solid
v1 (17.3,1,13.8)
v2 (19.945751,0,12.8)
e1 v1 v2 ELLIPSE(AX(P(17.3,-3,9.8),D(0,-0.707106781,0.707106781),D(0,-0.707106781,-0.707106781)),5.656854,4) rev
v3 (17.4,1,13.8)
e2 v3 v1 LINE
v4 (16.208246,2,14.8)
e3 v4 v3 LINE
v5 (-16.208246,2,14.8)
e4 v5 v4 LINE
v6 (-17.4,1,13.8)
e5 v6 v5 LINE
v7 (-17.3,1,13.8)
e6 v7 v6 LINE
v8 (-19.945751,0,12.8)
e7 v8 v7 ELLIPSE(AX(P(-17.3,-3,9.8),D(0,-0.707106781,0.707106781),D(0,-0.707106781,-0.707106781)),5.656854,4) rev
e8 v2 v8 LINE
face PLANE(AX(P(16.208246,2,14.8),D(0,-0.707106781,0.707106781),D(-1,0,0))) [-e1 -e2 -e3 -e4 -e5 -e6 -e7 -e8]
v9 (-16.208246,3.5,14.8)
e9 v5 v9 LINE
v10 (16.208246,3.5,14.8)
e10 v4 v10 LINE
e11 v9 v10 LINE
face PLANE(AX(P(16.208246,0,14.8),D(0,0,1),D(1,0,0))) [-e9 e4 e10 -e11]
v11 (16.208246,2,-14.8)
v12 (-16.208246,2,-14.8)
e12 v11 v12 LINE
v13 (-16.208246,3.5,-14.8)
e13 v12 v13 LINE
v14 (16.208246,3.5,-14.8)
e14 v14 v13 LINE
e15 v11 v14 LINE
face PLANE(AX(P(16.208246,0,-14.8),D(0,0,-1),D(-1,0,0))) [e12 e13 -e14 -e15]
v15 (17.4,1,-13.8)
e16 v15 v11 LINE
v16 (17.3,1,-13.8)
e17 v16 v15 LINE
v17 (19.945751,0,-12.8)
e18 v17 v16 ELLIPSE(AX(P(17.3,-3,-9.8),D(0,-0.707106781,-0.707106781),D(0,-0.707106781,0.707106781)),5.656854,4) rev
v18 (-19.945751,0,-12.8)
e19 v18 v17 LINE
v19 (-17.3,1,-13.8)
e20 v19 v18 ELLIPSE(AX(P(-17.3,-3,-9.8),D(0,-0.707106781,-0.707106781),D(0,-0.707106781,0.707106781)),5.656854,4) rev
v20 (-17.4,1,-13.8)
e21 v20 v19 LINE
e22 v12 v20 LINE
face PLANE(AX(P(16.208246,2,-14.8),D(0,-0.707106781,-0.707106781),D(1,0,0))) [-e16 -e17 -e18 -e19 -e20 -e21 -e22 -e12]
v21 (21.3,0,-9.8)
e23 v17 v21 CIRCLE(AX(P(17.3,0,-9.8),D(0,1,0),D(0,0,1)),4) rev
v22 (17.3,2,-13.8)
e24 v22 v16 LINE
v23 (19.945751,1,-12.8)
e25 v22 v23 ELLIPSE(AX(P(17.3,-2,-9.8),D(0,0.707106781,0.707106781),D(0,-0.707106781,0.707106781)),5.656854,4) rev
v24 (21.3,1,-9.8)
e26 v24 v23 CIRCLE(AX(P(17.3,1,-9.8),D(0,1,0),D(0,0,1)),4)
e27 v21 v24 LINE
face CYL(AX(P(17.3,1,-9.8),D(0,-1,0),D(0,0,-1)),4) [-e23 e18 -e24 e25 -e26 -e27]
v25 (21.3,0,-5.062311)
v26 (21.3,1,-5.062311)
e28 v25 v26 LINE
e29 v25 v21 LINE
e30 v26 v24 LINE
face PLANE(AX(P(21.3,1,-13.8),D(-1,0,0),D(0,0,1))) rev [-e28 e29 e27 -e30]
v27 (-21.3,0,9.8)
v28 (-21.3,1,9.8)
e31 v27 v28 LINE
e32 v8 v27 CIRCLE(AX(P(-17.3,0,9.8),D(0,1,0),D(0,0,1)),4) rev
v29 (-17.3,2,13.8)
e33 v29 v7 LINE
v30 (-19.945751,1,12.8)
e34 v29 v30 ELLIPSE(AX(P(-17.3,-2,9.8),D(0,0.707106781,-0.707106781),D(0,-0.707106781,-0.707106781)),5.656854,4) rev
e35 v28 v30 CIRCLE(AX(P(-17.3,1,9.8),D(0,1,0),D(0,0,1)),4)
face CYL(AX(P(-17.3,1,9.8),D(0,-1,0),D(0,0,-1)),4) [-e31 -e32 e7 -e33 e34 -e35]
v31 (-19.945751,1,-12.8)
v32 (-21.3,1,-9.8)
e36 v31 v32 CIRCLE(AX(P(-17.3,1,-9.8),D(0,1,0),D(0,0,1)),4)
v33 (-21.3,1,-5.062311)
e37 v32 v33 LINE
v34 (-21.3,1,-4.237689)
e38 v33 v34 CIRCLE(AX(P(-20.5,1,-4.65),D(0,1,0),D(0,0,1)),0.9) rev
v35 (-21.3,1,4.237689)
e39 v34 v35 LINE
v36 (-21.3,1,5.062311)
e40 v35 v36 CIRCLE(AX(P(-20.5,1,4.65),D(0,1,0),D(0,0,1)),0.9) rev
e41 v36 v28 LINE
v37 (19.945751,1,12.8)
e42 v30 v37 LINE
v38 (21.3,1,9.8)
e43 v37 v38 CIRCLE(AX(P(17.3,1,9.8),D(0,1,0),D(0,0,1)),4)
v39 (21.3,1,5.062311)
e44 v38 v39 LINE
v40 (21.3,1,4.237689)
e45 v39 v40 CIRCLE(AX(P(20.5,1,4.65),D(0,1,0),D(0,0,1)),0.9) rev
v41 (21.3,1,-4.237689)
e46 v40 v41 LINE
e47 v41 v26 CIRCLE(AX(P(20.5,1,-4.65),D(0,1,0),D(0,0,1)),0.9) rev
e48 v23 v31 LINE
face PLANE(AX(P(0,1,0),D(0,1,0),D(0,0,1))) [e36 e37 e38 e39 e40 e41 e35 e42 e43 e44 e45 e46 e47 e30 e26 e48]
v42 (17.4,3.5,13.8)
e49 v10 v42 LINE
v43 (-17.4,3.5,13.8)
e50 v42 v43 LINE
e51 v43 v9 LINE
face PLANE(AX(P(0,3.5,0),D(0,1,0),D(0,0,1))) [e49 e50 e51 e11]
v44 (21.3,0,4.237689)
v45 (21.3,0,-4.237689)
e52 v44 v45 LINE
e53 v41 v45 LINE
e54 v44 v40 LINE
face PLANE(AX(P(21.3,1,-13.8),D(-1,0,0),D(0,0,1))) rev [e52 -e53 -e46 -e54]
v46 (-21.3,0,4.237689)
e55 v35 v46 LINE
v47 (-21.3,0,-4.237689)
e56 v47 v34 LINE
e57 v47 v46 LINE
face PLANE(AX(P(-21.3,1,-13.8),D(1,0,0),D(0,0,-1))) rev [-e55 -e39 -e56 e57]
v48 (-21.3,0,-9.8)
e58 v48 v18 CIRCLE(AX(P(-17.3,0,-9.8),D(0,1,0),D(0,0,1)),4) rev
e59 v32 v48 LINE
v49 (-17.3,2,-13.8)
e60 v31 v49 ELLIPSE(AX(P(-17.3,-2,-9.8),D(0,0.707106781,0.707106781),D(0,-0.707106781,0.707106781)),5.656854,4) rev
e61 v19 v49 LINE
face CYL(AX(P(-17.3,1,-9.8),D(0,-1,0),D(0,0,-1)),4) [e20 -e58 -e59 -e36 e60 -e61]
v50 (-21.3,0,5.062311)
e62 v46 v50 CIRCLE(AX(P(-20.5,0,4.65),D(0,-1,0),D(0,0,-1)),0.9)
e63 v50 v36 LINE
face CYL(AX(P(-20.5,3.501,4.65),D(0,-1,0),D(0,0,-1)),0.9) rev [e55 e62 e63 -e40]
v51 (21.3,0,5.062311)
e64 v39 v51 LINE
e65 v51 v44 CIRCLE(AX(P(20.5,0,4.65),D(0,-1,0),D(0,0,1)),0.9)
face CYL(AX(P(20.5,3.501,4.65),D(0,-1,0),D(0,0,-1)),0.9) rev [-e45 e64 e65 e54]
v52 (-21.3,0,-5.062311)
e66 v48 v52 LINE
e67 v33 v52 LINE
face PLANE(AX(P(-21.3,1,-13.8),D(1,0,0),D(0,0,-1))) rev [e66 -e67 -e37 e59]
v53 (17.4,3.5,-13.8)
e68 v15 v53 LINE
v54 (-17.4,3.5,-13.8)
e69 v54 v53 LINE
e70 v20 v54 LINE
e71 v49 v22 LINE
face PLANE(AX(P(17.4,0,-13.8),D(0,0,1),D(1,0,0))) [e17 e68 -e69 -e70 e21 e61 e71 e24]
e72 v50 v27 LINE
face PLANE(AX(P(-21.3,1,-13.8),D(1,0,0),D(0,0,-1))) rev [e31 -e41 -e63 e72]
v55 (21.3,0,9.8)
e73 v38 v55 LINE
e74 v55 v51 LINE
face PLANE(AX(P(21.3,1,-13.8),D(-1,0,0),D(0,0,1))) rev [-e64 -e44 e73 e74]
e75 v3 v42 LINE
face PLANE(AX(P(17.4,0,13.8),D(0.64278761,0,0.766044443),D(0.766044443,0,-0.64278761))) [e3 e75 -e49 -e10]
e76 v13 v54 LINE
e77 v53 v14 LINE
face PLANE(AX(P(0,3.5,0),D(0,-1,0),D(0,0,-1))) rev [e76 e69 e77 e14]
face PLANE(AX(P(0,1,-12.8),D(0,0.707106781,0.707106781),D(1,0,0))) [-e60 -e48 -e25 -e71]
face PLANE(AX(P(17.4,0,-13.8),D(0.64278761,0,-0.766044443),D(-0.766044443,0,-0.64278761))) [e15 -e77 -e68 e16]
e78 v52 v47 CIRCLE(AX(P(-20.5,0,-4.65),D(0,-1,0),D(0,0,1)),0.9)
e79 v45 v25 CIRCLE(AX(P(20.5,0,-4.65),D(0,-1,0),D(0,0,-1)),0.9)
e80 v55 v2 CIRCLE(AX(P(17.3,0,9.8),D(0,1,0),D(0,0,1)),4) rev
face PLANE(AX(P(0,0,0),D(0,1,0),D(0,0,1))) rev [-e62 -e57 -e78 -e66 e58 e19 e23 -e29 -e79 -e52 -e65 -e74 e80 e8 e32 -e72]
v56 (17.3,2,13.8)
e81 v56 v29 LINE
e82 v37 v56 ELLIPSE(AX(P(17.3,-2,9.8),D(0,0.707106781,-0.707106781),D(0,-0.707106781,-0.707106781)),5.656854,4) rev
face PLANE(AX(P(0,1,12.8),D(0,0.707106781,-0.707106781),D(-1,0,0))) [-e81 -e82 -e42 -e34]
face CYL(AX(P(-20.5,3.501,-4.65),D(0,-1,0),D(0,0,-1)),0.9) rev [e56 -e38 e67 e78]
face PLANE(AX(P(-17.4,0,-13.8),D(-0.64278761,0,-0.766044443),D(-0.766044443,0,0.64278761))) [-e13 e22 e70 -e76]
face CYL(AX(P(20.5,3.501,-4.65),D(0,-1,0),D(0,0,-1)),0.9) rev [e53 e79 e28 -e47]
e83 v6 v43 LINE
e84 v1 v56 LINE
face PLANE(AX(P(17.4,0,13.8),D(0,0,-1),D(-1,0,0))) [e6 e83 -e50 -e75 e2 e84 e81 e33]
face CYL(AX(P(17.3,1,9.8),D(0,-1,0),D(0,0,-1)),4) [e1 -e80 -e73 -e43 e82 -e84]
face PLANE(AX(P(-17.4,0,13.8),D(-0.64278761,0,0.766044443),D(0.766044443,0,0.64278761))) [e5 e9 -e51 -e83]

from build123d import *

# Parameters (mm, degrees)
EXTRUDE_1_DEPTH      = 1
FILLET_1_R           = 4
EXTRUDE_2_DEPTH      = 2.5
EXTRUDE_2_DEPTH_BACK = 1
CHAMFER_1_SIZE       = 2
CHAMFER_3_SIZE       = 1
CUT_EXTRUDE_1_REACH  = 28.172
SKETCH_3_R           = 0.9000000000000004


with BuildPart() as part:
    # 草图1 → 凸台-拉伸1 (new body)
    with BuildSketch(Plane(origin=(0, 0, 0), x_dir=(1, 0, 0), z_dir=(0, 1, 0))):
        Polygon((-21.300000000000004, 13.800000000000002), (21.299999999999997, 13.800000000000002), (21.3, -13.799999999999999), (-21.3, -13.799999999999999), align=None)
    extrude(amount=EXTRUDE_1_DEPTH)

    # 圆角1
    fillet_1_edges = [part.edges().sort_by_distance(p)[0] for p in [
        (21.3, 0.5, 13.799999999999999),
        (-21.3, 0.5, 13.799999999999999),
        (-21.300000000000004, 0.5, -13.800000000000002),
        (21.299999999999997, 0.5, -13.800000000000002),
    ]]
    fillet(fillet_1_edges, radius=FILLET_1_R)

    # 草图2 → 凸台-拉伸2 (add, two sides: drawn at the far end of the back side and taken through both)
    with BuildSketch(Plane(origin=(0, 1, 0), x_dir=(1, 0, 0), z_dir=(0, 1, 0)).offset(-EXTRUDE_2_DEPTH_BACK)):
        Polygon((17.4, -13.800000000000002), (16.208246407405806, -14.8), (-16.208246407405806, -14.8), (-17.4, -13.800000000000002), align=None)
        Polygon((-17.400000000000002, 13.799999999999994), (-16.208246407405802, 14.8), (16.208246407405802, 14.8), (17.400000000000002, 13.799999999999994), align=None)
    extrude(amount=EXTRUDE_2_DEPTH + EXTRUDE_2_DEPTH_BACK)

    # 倒角1
    chamfer_1_edges = [part.edges().sort_by_distance(p)[0] for p in [
        (0, 0, 14.8),
        (0, 0, -14.8),
    ]]
    chamfer(chamfer_1_edges, length=CHAMFER_1_SIZE - 0.0001)  # a hair under: the kernel refuses the full size

    # 倒角3
    chamfer_3_edges = [part.edges().sort_by_distance(p)[0] for p in [
        (-3.55e-15, 1, -13.800000000000002),
        (0, 1, 13.799999999999999),
    ]]
    chamfer(chamfer_3_edges, length=CHAMFER_3_SIZE)

    # 草图3 → 切除-拉伸1 (cut, up to next)
    with BuildSketch(Plane.XZ, mode=Mode.PRIVATE) as cut_extrude_1_sk1:
        with Locations((-20.500000000000004, 4.65)):
            Circle(SKETCH_3_R)
    cut_extrude_1_tool1 = extrude(cut_extrude_1_sk1.sketch, amount=-CUT_EXTRUDE_1_REACH, mode=Mode.PRIVATE) & part.part
    # 草图3 → 切除-拉伸1 (cut, up to next)
    with BuildSketch(Plane.XZ, mode=Mode.PRIVATE) as cut_extrude_1_sk2:
        with Locations((-20.500000000000004, -4.65)):
            Circle(SKETCH_3_R)
    cut_extrude_1_tool2 = extrude(cut_extrude_1_sk2.sketch, amount=-CUT_EXTRUDE_1_REACH, mode=Mode.PRIVATE) & part.part
    # 草图3 → 切除-拉伸1 (cut, up to next)
    with BuildSketch(Plane.XZ, mode=Mode.PRIVATE) as cut_extrude_1_sk3:
        with Locations((20.50000000000001, -4.649999999999995)):
            Circle(SKETCH_3_R)
    cut_extrude_1_tool3 = extrude(cut_extrude_1_sk3.sketch, amount=-CUT_EXTRUDE_1_REACH, mode=Mode.PRIVATE) & part.part
    # 草图3 → 切除-拉伸1 (cut, up to next)
    with BuildSketch(Plane.XZ, mode=Mode.PRIVATE) as cut_extrude_1_sk4:
        with Locations((20.500000000000004, 4.650000000000006)):
            Circle(SKETCH_3_R)
    cut_extrude_1_tool4 = extrude(cut_extrude_1_sk4.sketch, amount=-CUT_EXTRUDE_1_REACH, mode=Mode.PRIVATE) & part.part
    add(cut_extrude_1_tool1.solids().sort_by_distance((-20.5, 0, 4.65))[0], mode=Mode.SUBTRACT)
    add(cut_extrude_1_tool2.solids().sort_by_distance((-20.5, 0, -4.65))[0], mode=Mode.SUBTRACT)
    add(cut_extrude_1_tool3.solids().sort_by_distance((20.5, 0, -4.65))[0], mode=Mode.SUBTRACT)
    add(cut_extrude_1_tool4.solids().sort_by_distance((20.5, 0, 4.65))[0], mode=Mode.SUBTRACT)


solid = part.part
